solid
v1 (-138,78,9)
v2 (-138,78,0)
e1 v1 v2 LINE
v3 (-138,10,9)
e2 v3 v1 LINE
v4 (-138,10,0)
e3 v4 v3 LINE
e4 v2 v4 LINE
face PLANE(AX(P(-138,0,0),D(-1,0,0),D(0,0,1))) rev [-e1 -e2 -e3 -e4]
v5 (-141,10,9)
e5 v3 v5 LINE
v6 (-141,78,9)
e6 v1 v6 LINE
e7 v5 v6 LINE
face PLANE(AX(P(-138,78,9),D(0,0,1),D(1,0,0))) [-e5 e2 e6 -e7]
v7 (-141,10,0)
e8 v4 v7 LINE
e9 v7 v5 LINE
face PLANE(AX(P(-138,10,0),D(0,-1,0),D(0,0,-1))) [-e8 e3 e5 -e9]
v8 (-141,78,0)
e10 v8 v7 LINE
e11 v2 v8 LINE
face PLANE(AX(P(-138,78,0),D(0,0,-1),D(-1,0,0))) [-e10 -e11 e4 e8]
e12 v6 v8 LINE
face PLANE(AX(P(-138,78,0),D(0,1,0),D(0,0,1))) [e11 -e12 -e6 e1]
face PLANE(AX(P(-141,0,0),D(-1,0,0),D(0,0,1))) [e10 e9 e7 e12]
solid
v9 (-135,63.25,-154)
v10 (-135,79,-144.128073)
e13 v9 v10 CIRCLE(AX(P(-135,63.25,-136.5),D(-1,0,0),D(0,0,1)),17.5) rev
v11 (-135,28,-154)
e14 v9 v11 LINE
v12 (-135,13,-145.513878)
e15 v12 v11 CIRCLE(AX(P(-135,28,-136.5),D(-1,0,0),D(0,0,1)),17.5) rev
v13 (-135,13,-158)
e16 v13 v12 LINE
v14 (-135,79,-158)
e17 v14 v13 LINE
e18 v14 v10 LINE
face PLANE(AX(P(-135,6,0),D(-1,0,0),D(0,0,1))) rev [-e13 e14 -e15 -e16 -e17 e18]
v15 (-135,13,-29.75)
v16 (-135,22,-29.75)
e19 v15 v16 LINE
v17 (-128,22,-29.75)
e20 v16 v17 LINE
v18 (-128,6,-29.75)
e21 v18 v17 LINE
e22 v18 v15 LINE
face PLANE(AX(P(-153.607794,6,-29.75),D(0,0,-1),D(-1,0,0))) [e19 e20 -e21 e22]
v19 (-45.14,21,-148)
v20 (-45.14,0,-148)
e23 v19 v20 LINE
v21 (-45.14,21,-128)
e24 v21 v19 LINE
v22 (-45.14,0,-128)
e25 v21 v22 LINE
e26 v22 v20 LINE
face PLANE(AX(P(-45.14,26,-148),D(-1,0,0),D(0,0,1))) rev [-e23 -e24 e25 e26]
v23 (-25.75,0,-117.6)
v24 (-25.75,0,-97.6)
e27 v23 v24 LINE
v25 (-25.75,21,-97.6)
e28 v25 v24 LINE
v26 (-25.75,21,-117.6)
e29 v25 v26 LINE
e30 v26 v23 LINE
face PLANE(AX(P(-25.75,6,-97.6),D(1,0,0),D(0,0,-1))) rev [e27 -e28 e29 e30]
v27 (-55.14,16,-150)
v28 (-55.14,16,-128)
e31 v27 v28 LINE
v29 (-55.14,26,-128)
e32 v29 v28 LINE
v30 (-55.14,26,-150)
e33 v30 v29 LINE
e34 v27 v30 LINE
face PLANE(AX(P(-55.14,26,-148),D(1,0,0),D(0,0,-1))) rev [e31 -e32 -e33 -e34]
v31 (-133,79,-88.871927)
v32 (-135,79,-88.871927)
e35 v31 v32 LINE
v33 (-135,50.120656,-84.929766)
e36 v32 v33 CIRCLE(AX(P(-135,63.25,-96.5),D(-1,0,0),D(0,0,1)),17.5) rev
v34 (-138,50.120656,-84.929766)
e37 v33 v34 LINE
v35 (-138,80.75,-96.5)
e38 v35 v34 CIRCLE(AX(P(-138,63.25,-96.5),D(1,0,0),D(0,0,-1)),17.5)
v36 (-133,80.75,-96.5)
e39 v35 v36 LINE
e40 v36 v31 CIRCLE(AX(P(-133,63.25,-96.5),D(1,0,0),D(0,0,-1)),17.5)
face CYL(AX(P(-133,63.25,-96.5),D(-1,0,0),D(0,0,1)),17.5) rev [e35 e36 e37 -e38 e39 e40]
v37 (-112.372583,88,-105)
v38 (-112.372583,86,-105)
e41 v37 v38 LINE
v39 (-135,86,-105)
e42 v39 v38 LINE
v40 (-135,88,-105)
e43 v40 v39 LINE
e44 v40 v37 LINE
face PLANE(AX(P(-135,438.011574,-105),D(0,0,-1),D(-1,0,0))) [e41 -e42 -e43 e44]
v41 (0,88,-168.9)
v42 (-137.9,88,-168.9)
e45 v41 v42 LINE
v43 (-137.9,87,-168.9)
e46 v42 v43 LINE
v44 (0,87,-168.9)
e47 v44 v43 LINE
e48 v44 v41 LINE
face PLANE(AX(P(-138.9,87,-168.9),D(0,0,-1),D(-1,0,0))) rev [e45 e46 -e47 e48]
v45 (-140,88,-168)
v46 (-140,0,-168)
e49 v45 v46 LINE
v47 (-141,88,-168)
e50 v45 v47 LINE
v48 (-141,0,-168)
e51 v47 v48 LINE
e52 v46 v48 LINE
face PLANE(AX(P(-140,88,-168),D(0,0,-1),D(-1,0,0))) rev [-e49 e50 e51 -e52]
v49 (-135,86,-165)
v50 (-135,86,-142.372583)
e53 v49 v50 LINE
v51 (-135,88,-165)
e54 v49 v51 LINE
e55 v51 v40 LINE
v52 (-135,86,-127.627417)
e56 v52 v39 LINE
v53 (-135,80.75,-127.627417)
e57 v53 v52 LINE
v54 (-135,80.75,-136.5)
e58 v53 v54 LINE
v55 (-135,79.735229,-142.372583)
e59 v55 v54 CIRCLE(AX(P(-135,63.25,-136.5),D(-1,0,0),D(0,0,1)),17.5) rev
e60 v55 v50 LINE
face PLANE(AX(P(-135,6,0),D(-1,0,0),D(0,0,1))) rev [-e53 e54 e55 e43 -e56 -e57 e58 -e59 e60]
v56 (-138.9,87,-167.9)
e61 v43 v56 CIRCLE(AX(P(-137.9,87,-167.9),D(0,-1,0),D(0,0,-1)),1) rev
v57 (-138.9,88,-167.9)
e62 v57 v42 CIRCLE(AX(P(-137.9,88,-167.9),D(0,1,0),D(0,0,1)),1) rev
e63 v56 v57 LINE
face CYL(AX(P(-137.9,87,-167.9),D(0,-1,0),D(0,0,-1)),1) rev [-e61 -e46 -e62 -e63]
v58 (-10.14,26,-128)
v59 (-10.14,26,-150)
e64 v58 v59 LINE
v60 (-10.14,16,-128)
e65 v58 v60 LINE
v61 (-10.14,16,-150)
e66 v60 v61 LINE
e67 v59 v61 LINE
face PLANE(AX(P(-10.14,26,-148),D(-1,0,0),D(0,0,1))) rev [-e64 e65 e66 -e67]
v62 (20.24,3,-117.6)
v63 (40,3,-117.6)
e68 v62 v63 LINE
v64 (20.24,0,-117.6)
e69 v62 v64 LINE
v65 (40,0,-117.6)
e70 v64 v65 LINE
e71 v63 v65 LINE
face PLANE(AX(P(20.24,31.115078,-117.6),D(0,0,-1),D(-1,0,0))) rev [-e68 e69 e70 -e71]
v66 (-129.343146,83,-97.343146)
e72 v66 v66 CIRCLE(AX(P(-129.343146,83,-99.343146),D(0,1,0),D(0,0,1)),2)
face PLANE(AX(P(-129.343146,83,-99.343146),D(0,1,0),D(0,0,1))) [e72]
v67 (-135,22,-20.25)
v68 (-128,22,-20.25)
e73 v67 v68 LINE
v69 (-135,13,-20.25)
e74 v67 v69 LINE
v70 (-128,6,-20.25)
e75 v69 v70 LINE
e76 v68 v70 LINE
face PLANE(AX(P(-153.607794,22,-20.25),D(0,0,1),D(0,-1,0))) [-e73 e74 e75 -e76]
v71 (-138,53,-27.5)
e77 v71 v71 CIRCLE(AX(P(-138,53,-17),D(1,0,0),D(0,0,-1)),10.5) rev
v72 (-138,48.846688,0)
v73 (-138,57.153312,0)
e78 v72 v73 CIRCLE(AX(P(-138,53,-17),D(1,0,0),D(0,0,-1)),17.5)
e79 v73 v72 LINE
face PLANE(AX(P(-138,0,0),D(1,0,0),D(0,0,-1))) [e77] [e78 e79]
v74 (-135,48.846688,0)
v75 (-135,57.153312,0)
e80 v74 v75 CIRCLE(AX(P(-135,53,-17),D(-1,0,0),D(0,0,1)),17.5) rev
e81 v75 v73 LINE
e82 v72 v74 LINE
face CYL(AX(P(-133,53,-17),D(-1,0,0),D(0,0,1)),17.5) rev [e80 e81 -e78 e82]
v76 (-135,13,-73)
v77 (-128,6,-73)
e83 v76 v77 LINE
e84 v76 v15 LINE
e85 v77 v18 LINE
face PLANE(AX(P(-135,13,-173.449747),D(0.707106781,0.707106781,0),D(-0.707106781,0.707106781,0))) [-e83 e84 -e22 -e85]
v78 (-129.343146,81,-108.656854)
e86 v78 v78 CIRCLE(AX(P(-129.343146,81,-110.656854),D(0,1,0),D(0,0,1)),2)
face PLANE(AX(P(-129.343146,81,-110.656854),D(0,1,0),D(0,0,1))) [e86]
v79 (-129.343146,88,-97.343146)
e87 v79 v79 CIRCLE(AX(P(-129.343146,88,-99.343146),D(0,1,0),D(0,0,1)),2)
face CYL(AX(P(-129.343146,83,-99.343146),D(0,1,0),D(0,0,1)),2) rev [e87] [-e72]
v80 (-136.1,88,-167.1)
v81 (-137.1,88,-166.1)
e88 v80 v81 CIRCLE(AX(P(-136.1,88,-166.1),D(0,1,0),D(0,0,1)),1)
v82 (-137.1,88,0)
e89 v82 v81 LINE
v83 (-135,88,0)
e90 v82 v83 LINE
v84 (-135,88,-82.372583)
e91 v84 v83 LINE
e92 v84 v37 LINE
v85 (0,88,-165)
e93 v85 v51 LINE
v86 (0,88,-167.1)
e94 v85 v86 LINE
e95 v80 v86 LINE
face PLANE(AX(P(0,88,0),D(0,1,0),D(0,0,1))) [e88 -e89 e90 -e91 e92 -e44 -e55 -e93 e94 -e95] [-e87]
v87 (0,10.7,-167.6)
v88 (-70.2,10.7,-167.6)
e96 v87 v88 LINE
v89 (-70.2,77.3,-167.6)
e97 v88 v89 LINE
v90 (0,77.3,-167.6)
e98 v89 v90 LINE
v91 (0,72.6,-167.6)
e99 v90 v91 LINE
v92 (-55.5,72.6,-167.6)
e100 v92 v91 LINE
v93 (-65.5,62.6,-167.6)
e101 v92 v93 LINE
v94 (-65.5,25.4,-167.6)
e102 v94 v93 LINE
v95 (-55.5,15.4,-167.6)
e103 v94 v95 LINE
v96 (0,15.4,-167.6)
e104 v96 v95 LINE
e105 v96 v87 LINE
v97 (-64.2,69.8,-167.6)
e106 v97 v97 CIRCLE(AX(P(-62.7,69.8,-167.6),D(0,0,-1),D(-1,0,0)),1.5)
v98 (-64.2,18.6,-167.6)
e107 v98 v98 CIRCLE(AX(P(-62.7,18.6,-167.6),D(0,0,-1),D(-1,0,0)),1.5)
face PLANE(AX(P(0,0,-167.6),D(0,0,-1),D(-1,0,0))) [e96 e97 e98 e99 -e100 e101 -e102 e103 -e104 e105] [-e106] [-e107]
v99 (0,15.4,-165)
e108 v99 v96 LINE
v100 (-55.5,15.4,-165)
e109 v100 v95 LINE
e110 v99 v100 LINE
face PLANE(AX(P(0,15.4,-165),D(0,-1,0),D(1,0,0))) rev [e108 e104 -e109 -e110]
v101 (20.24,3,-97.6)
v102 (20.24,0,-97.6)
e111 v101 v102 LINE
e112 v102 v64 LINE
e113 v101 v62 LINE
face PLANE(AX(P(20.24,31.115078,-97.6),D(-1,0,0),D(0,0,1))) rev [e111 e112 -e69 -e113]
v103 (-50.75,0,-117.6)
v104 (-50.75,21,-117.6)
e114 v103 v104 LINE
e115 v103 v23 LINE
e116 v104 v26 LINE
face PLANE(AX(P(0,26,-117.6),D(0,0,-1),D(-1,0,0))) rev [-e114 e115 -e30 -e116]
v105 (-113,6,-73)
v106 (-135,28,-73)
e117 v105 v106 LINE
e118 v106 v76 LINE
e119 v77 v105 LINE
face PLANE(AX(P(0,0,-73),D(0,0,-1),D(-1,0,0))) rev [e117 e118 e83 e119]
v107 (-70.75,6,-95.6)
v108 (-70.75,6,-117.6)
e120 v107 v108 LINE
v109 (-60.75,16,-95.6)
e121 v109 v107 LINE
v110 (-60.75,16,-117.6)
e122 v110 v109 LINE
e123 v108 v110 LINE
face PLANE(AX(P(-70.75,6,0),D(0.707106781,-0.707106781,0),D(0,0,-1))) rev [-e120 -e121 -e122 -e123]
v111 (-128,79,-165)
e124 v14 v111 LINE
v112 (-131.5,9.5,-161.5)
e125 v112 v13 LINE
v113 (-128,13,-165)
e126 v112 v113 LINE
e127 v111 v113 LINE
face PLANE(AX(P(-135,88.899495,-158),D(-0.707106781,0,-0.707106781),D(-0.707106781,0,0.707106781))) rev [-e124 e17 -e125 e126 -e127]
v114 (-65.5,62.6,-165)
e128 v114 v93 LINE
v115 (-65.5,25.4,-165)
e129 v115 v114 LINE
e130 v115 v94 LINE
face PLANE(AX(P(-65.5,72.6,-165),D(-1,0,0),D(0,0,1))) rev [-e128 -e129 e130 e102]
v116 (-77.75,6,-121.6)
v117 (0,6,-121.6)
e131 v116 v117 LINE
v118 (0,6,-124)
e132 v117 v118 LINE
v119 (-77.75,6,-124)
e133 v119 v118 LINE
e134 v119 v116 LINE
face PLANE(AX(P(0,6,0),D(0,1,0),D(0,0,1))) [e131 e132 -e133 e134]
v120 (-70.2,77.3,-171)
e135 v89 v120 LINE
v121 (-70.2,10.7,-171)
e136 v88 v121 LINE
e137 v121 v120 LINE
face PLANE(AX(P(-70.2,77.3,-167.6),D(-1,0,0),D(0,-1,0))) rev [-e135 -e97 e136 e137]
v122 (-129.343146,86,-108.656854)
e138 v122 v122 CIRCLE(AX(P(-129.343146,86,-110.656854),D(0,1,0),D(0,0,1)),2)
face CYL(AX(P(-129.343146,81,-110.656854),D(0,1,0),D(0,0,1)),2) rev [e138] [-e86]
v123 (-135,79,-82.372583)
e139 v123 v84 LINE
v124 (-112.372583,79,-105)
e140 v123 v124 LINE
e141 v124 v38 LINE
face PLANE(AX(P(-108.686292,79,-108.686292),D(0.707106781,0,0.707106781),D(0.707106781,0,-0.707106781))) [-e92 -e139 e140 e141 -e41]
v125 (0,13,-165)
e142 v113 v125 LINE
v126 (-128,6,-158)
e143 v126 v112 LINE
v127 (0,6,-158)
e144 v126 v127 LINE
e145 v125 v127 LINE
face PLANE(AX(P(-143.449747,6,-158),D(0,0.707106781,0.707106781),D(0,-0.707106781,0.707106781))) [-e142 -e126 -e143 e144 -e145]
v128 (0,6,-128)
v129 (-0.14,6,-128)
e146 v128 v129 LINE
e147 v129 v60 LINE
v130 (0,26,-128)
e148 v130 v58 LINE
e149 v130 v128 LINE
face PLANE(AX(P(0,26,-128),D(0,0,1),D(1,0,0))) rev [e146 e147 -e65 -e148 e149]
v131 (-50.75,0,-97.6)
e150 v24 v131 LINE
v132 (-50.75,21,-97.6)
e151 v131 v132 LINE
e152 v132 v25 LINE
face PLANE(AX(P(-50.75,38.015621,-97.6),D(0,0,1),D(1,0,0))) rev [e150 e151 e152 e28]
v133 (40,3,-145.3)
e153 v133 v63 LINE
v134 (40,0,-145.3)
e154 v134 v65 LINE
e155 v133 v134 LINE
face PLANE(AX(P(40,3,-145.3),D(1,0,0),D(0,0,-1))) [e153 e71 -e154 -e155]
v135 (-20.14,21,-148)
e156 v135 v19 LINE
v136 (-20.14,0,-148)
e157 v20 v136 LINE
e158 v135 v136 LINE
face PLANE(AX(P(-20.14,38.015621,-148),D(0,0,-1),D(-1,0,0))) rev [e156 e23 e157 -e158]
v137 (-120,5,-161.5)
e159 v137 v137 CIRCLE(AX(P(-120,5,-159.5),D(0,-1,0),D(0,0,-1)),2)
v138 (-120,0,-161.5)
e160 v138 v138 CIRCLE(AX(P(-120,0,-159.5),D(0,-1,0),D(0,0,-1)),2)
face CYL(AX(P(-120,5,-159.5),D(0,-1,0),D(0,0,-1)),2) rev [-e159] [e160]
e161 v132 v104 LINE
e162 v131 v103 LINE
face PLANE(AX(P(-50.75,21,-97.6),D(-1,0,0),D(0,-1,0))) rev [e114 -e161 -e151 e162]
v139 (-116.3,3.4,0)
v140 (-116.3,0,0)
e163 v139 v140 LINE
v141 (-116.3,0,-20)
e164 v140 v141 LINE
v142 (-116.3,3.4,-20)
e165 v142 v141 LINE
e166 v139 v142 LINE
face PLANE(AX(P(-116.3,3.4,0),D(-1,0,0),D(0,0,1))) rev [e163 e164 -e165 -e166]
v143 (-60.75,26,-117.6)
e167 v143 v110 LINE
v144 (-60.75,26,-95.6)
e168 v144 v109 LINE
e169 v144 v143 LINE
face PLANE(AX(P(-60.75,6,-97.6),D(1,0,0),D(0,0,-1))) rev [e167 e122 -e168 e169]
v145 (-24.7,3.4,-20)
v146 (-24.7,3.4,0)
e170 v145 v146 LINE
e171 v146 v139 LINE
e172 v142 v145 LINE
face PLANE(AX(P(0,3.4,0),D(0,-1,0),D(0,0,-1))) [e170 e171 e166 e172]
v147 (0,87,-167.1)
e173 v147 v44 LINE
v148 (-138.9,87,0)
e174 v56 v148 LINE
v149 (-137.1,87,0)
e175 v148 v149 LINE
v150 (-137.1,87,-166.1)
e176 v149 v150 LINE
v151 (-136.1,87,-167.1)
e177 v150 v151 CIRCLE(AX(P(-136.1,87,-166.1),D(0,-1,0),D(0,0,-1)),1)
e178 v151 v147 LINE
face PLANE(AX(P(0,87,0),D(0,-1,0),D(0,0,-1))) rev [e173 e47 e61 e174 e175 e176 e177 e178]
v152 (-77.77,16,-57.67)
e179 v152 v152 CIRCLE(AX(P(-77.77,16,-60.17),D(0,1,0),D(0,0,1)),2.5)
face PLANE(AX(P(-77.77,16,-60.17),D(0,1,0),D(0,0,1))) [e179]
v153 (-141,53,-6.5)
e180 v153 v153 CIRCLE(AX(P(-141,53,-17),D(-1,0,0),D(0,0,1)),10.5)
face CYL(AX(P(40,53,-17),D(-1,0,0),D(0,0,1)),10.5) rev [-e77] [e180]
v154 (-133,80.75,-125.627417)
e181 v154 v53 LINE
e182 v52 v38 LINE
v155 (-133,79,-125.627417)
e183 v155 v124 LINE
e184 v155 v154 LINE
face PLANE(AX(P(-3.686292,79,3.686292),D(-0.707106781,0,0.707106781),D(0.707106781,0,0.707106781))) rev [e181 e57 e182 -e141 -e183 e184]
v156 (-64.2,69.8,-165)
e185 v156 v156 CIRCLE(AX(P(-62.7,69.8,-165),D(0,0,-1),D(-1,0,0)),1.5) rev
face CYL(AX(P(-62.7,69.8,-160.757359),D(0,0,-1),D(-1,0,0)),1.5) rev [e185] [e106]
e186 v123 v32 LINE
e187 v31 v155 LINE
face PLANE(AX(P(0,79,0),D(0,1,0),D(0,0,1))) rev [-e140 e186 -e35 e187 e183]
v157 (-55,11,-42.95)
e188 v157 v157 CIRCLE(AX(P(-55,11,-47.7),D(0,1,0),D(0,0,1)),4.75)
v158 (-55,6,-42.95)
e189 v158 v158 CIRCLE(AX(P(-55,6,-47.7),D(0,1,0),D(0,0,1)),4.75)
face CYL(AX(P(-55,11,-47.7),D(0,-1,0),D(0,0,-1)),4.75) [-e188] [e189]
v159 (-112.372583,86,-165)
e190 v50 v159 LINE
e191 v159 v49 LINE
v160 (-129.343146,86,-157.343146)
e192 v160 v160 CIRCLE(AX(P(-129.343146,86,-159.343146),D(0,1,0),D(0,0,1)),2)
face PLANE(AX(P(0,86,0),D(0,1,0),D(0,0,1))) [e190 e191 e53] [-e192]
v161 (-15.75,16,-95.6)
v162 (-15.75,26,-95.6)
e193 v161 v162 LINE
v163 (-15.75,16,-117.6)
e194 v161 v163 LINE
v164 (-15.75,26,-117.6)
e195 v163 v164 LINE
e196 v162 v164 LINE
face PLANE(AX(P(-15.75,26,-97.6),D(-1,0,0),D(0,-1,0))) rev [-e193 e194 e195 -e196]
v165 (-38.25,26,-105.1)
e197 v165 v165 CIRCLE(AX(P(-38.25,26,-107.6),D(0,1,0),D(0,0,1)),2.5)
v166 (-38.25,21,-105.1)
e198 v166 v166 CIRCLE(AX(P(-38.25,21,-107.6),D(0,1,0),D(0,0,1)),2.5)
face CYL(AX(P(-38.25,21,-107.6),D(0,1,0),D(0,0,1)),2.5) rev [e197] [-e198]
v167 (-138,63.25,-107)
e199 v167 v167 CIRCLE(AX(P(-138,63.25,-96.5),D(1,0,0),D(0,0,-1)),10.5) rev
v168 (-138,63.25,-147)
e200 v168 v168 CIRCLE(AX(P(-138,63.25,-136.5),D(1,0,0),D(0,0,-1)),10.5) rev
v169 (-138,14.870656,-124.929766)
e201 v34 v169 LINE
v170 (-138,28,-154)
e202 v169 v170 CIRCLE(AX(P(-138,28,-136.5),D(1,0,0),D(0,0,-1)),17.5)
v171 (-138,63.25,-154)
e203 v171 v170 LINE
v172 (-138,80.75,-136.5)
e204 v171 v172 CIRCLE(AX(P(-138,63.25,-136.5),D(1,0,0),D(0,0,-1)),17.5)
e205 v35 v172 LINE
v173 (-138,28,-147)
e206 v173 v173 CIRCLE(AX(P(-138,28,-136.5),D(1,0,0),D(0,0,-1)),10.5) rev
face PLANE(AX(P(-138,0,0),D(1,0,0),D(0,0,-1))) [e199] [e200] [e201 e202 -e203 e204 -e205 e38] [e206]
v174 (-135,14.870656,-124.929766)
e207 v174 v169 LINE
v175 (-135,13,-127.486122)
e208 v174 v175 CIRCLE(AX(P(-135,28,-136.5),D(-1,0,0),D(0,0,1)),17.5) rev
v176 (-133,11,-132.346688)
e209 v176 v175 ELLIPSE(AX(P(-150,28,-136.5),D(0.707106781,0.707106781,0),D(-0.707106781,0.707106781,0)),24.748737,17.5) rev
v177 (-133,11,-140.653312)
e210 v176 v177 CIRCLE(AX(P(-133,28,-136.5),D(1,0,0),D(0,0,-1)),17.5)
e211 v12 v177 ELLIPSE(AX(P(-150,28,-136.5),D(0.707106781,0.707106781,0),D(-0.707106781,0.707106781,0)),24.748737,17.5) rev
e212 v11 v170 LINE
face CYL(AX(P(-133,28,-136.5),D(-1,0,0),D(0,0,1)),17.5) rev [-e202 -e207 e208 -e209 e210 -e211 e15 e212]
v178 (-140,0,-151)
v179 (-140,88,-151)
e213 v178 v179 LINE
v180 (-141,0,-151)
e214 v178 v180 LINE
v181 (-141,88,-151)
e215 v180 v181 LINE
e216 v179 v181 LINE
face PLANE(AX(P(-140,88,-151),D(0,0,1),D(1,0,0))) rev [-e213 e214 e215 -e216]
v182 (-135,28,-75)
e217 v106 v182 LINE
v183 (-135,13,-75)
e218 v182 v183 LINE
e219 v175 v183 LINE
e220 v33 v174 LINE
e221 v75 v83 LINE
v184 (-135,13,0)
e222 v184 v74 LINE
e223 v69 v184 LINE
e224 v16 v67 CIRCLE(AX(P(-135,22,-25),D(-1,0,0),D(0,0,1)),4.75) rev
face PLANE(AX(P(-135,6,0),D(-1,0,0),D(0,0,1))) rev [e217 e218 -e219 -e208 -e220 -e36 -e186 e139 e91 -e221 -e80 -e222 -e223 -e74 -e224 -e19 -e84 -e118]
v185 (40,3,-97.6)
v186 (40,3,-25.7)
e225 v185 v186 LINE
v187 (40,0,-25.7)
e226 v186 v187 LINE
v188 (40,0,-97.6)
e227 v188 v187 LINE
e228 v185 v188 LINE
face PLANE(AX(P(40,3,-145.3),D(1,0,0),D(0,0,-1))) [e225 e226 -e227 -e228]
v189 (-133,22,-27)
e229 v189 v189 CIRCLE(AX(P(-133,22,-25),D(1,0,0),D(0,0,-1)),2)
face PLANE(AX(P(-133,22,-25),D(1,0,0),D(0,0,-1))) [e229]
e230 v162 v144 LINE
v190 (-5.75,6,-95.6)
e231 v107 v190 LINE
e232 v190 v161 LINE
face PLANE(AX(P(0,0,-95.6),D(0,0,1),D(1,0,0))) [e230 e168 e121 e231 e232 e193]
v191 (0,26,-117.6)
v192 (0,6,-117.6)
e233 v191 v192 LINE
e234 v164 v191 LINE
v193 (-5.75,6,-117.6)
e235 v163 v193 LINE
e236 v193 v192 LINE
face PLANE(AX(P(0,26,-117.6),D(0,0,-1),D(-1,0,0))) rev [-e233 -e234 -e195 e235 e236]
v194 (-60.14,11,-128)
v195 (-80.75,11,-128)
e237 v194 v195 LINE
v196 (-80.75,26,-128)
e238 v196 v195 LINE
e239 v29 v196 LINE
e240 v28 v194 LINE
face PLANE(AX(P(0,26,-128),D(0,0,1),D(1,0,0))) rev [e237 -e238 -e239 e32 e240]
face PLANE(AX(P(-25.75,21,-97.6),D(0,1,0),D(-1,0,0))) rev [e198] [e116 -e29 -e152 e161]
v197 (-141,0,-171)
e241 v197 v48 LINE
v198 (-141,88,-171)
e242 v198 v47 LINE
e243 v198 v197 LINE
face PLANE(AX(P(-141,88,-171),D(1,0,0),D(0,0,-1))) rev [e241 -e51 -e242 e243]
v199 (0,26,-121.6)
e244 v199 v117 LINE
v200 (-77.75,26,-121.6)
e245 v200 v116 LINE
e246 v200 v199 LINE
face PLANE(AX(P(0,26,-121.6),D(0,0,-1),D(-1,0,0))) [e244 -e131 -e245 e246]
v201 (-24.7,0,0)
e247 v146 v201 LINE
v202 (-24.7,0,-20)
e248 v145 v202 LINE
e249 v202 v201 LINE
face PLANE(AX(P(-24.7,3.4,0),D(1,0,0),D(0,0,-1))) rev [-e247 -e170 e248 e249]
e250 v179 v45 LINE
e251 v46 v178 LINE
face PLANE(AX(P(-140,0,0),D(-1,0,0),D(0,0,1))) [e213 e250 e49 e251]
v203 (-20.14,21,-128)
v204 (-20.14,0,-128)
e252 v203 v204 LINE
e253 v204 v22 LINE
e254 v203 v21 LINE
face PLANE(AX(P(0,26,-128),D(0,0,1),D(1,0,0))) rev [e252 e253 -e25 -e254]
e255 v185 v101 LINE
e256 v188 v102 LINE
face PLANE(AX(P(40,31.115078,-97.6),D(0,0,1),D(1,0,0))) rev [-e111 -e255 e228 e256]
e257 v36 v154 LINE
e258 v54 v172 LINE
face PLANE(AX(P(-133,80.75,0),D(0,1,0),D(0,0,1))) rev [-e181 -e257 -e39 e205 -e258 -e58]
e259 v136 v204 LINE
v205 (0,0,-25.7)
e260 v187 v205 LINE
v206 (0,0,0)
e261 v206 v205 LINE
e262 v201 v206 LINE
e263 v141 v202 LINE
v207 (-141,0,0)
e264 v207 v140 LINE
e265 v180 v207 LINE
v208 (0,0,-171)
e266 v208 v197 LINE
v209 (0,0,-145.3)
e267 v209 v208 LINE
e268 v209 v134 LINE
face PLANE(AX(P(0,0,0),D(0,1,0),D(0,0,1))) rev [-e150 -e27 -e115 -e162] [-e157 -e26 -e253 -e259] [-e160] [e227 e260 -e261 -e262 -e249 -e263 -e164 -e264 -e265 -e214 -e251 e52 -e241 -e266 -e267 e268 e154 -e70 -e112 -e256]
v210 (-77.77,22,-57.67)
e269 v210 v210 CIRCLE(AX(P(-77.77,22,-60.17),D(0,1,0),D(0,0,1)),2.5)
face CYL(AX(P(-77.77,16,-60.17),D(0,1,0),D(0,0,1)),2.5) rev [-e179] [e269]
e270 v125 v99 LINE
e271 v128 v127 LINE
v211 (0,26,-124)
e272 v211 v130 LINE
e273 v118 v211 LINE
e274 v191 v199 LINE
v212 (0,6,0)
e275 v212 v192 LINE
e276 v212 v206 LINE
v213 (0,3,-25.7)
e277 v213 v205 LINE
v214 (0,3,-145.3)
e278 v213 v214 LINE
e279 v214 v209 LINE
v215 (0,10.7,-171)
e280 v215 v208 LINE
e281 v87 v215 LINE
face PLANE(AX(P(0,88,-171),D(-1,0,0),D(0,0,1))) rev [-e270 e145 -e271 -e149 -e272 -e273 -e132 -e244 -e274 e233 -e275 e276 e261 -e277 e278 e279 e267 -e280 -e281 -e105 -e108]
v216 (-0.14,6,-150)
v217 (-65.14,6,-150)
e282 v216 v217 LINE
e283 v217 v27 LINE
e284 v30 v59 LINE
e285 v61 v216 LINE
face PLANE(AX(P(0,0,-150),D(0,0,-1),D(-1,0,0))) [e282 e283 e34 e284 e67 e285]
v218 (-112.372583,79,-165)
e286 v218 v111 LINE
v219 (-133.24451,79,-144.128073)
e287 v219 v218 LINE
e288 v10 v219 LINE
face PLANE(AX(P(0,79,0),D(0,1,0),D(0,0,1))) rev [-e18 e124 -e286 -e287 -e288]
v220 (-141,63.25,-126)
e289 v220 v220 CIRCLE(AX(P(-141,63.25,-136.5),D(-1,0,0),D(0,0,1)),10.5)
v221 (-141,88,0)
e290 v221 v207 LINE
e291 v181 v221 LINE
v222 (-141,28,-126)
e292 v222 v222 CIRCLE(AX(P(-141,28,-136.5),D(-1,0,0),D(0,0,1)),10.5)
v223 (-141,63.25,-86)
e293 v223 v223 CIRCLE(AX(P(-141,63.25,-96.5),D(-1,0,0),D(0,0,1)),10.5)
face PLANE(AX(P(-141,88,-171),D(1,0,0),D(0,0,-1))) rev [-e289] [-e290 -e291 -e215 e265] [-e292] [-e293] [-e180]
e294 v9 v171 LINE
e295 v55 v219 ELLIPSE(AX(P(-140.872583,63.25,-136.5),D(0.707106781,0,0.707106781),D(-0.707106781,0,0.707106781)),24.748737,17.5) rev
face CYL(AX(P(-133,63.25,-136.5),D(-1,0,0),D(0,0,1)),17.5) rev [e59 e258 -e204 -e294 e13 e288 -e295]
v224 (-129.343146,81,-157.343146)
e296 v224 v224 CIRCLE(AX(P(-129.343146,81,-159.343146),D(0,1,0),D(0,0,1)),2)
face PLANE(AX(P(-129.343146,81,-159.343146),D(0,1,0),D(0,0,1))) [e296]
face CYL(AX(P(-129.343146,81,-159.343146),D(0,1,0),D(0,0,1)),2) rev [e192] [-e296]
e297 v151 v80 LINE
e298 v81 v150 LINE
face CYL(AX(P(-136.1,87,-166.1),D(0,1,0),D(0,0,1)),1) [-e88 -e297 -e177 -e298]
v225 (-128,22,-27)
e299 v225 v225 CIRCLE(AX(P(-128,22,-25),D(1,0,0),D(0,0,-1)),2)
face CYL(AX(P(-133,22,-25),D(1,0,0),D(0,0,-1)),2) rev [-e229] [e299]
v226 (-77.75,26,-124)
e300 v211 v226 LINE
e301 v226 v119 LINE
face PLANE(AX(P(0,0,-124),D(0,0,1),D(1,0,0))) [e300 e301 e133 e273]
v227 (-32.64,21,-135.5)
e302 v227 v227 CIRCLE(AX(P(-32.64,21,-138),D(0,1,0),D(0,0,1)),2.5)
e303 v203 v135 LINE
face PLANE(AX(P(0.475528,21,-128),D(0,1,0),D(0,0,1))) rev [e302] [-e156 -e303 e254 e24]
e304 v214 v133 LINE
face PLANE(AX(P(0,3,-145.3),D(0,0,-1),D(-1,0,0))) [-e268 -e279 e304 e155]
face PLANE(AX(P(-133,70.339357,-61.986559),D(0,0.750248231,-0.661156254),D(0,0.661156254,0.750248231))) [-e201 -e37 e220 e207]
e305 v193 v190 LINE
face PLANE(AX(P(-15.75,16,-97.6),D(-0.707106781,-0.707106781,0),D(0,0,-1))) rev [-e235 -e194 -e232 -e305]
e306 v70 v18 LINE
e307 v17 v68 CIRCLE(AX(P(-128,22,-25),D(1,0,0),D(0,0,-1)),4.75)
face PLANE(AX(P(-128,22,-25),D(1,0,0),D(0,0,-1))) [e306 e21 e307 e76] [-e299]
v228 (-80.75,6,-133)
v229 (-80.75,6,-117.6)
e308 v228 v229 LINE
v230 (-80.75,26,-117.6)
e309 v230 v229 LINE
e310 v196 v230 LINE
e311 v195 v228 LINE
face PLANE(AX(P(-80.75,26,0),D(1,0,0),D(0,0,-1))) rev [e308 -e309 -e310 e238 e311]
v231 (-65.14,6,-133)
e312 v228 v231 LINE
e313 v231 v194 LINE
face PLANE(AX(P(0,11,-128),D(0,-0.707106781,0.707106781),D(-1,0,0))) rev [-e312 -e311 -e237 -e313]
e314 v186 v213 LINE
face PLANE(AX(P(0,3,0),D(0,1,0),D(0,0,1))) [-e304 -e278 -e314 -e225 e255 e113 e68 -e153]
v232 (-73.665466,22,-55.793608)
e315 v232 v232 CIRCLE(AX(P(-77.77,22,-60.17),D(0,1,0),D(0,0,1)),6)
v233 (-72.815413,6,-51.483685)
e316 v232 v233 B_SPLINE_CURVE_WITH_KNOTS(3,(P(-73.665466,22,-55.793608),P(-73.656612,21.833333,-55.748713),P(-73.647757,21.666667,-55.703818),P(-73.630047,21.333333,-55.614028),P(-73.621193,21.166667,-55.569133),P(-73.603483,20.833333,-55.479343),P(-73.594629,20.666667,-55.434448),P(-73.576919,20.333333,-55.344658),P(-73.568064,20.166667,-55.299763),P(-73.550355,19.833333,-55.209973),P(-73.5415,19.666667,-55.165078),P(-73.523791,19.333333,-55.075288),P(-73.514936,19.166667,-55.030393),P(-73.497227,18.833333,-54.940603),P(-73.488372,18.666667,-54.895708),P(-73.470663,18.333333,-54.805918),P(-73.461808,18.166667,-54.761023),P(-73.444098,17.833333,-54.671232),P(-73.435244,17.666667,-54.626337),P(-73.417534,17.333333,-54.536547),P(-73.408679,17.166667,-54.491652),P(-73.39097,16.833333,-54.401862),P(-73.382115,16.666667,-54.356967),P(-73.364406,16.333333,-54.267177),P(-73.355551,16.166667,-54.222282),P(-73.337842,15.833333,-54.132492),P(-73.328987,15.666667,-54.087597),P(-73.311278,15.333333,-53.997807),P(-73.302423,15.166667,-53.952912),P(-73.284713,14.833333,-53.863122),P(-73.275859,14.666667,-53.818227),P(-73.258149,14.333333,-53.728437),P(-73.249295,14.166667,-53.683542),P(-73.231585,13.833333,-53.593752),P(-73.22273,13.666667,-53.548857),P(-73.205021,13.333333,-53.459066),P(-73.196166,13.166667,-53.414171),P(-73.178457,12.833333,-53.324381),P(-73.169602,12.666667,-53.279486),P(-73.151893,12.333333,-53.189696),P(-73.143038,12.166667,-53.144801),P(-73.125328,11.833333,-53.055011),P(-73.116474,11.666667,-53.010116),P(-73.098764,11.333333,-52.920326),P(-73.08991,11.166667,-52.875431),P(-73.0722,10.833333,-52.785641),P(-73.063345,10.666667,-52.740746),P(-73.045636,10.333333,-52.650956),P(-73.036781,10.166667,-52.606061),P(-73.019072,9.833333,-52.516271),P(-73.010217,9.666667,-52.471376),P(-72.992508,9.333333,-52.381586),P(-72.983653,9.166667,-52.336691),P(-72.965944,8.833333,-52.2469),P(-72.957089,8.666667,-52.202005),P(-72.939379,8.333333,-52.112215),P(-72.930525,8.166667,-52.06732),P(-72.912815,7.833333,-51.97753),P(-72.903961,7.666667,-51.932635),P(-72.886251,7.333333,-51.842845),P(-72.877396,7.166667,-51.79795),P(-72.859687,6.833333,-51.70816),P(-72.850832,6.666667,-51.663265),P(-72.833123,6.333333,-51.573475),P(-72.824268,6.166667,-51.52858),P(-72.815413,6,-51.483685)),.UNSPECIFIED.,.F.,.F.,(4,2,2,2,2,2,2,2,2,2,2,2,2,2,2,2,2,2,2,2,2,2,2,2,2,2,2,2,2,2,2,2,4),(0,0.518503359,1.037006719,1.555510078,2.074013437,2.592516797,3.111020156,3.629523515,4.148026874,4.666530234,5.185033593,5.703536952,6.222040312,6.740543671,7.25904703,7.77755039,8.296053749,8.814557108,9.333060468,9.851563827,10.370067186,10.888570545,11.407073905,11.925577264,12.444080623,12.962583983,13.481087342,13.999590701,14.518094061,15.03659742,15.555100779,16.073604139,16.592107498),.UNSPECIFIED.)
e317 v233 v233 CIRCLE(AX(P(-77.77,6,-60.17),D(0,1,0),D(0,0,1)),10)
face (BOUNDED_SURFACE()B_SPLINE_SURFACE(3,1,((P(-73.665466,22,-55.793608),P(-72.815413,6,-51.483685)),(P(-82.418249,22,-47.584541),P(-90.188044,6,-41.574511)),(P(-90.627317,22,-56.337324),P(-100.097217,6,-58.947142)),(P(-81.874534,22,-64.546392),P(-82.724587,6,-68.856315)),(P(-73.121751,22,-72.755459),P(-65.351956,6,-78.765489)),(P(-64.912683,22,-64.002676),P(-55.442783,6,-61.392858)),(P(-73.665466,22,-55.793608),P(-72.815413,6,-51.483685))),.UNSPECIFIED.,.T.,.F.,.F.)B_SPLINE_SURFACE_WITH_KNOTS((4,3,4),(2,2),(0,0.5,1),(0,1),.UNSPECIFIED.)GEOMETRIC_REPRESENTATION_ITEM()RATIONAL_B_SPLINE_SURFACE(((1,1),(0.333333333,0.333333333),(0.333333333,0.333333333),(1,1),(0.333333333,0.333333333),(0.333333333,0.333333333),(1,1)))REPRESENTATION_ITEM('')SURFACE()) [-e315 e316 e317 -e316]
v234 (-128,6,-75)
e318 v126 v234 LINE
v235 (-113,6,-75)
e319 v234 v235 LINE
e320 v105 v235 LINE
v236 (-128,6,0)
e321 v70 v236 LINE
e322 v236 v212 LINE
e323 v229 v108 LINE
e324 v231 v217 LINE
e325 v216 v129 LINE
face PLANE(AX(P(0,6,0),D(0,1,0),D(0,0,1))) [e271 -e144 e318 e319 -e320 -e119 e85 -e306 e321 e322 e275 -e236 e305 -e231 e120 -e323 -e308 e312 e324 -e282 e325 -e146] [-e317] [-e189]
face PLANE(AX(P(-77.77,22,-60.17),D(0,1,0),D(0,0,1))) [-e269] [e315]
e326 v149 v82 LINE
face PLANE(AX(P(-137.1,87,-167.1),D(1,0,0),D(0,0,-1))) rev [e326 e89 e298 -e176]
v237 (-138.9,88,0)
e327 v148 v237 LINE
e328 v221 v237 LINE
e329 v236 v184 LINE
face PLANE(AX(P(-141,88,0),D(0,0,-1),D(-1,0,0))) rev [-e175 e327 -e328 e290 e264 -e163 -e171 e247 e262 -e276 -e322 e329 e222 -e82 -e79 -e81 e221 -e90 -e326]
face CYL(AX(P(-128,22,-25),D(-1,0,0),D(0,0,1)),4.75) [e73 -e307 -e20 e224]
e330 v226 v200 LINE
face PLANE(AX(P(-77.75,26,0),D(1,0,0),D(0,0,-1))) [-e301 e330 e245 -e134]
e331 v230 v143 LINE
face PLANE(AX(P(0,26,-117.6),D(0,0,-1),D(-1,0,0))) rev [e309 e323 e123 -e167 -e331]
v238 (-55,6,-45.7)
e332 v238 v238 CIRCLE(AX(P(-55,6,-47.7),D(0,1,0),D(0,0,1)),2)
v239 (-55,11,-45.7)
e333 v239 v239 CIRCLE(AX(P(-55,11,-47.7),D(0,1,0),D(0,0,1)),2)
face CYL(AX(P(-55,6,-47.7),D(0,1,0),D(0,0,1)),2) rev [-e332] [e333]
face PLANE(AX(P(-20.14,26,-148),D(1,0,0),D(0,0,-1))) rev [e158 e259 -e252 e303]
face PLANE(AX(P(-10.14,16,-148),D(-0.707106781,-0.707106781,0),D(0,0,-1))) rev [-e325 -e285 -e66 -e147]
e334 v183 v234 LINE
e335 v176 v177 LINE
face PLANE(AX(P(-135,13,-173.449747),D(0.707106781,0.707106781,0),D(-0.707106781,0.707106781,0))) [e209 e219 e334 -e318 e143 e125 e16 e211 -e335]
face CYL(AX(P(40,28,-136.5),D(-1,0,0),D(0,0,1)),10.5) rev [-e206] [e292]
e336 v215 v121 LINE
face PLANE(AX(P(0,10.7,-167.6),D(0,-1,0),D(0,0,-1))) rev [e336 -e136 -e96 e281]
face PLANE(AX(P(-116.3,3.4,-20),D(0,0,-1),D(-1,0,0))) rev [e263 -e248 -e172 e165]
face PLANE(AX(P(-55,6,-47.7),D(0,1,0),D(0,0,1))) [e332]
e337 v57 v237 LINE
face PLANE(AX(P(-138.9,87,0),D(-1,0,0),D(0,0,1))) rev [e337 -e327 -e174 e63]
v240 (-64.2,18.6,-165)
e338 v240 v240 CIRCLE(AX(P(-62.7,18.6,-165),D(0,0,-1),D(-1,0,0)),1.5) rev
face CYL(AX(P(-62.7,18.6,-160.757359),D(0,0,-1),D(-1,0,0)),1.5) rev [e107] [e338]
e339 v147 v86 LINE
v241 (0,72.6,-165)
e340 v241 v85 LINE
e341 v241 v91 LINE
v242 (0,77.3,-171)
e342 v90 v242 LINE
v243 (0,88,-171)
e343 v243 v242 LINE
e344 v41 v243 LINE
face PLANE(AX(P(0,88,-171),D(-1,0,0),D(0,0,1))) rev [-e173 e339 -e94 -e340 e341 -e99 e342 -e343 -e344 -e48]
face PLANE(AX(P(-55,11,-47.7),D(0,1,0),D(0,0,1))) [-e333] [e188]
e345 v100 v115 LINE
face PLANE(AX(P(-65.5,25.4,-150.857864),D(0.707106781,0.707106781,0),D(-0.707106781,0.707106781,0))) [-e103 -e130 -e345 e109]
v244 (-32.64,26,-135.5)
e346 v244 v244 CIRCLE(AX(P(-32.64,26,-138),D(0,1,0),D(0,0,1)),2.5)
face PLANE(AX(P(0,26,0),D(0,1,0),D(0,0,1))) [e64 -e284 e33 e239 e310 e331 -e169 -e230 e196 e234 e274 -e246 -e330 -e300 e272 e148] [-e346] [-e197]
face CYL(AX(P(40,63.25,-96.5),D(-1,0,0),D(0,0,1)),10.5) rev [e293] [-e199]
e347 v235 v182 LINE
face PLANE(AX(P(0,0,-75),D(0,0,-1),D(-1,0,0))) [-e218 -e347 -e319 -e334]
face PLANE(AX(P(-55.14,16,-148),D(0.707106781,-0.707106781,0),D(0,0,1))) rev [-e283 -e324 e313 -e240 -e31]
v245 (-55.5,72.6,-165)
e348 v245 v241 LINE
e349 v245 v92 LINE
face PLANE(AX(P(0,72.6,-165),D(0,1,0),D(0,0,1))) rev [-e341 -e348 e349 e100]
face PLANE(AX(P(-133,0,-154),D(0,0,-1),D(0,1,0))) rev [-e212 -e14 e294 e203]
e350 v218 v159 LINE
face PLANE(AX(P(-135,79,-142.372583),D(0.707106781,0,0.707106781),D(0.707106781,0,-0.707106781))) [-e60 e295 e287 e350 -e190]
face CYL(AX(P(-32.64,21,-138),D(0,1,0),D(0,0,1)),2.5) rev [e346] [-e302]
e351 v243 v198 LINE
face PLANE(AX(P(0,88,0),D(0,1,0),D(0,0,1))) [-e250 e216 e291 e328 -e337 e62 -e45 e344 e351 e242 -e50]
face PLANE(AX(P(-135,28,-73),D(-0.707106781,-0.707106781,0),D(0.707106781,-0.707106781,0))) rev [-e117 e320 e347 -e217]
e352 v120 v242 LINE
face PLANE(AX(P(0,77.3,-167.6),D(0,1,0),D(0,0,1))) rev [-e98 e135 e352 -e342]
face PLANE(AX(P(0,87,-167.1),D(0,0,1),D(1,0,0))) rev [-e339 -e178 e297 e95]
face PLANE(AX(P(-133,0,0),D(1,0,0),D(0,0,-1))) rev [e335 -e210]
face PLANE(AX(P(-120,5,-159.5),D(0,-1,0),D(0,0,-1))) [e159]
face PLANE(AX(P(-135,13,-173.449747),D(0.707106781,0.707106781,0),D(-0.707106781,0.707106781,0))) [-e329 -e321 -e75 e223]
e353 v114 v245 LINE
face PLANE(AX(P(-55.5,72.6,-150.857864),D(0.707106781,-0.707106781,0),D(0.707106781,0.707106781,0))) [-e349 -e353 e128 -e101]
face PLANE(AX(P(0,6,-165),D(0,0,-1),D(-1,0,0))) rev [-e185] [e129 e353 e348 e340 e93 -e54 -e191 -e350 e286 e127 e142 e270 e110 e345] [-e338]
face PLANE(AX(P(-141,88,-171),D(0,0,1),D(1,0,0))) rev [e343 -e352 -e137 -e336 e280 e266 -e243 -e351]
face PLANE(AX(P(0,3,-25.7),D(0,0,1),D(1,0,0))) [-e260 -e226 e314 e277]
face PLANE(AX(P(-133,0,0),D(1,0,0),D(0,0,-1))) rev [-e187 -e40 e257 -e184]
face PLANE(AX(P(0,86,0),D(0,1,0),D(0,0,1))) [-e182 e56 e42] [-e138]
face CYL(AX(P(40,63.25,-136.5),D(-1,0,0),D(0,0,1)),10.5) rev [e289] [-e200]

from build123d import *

# Parameters (mm, degrees)
SKETCH1_W                = 141
SKETCH1_H                = 171
BOSS_EXTRUDE1_DEPTH      = 88
SKETCH2_W                = 135
SKETCH2_H                = 165
CUT_EXTRUDE1_DEPTH       = 82
SKETCH3_W                = 40
SKETCH3_H                = 119.6
BOSS_EXTRUDE2_DEPTH      = 3
SKETCH4_W                = 91.6
SKETCH4_H                = 20
CUT_EXTRUDE2_DEPTH       = 3.4
SKETCH5_W                = 9
SKETCH5_H                = 68
BOSS_EXTRUDE3_DEPTH      = 3
SKETCH7_W                = 70.2
SKETCH7_H                = 66.6
CUT_EXTRUDE4_DEPTH       = 3.4
SKETCH9_W                = 65.5
SKETCH9_H                = 57.2
CUT_EXTRUDE5_DEPTH       = 2.6
SKETCH10_R               = 10.5
CUT_EXTRUDE6_DEPTH       = 265.094679992
BOSS_EXTRUDE5_DEPTH      = 7
BOSS_EXTRUDE6_DEPTH      = 9
CUT_EXTRUDE7_DEPTH       = 239.465930481
CUT_EXTRUDE7_DEPTH_BACK  = 2
BOSS_EXTRUDE7_DEPTH      = 73
SKETCH16_R               = 2
CUT_EXTRUDE8_DEPTH       = 5
SKETCH17_R               = 2
CUT_EXTRUDE9_DEPTH       = 5
SKETCH18_R               = 4.75
BOSS_EXTRUDE8_DEPTH      = 5
SKETCH20_R               = 2
CUT_EXTRUDE11_DEPTH      = 5
BOSS_EXTRUDE25_REACH     = 240.466
BOSS_EXTRUDE26_REACH     = 240.466
SKETCH43_R               = 2.5
CUT_EXTRUDE14_DEPTH      = 6
SKETCH45_R               = 4.75
BOSS_EXTRUDE27_DEPTH     = 7
SKETCH46_R               = 2
CUT_EXTRUDE15_DEPTH      = 5
CUT_EXTRUDE16_DEPTH      = 2
CUT_EXTRUDE16_DEPTH_BACK = 3
SKETCH47_R               = 17.5
SKETCH55_W               = 10
SKETCH55_H               = 20
BOSS_EXTRUDE34_DEPTH     = 20
SKETCH56_W               = 20
SKETCH56_H               = 5
BOSS_EXTRUDE35_DEPTH     = 25
CHAMFER2_SIZE            = 10
CHAMFER3_SIZE            = 10
SKETCH57_R               = 2.5
CUT_EXTRUDE17_DEPTH      = 5
BOSS_EXTRUDE36_DEPTH     = 20
CHAMFER6_SIZE            = 5
BOSS_EXTRUDE37_DEPTH     = 20
CHAMFER7_SIZE            = 10
CHAMFER8_SIZE            = 10
SKETCH60_R               = 2.5
CUT_EXTRUDE18_DEPTH      = 5
CUT_EXTRUDE19_DEPTH      = 1
SKETCH63_W               = 17
SKETCH63_H               = 88
CUT_EXTRUDE20_DEPTH      = 1
BOSS_EXTRUDE39_START     = -7
BOSS_EXTRUDE39_DEPTH     = 7
BOSS_EXTRUDE40_DEPTH     = 2
SKETCH67_W               = 77.75
SKETCH67_H               = 20
BOSS_EXTRUDE41_DEPTH     = 1
BOSS_EXTRUDE42_DEPTH     = 2.6
SKETCH69_R               = 1.5
CUT_EXTRUDE21_DEPTH      = 2.6
FILLET1_R                = 1
FILLET2_R                = 1
SKETCH70_W               = 25
SKETCH70_H               = 20
CUT_EXTRUDE22_DEPTH      = 6
BOSS_EXTRUDE43_DEPTH     = 2
BOSS_EXTRUDE44_DEPTH     = 2
SKETCH73_W               = 19.76
SKETCH73_H               = 20
CUT_EXTRUDE23_DEPTH      = 3
SKETCH74_R               = 2
CUT_EXTRUDE24_DEPTH      = 5


with BuildPart() as part:
    # Sketch1 → Boss-Extrude1 (new body)
    with BuildSketch(Plane(origin=(0, 0, 0), x_dir=(1, 0, 0), z_dir=(0, 1, 0))):
        with Locations((-70.5, 85.5)):
            Rectangle(SKETCH1_W, SKETCH1_H)
    extrude(amount=BOSS_EXTRUDE1_DEPTH)

    # Sketch2 → Cut-Extrude1 (cut)
    with BuildSketch(Plane(origin=(0, 88, 0), x_dir=(1, 0, 0), z_dir=(0, 1, 0))):
        with Locations((-67.5, 82.5)):
            Rectangle(SKETCH2_W, SKETCH2_H)
    extrude(amount=-CUT_EXTRUDE1_DEPTH, mode=Mode.SUBTRACT)

    # Sketch3 → Boss-Extrude2 (add)
    with BuildSketch(Plane.XZ):
        with Locations((20, -85.5)):
            Rectangle(SKETCH3_W, SKETCH3_H)
    extrude(amount=-BOSS_EXTRUDE2_DEPTH)

    # Sketch4 → Cut-Extrude2 (cut)
    with BuildSketch(Plane.XZ):
        with Locations((-70.5, -10)):
            Rectangle(SKETCH4_W, SKETCH4_H)
    extrude(amount=-CUT_EXTRUDE2_DEPTH, mode=Mode.SUBTRACT)

    # Sketch7 → Cut-Extrude4 (cut)
    with BuildSketch(Plane(origin=(0, 0, -171), x_dir=(-1, 0, 0), z_dir=(0, 0, -1))):
        with Locations((35.1, 44)):
            Rectangle(SKETCH7_W, SKETCH7_H)
    extrude(amount=-CUT_EXTRUDE4_DEPTH, mode=Mode.SUBTRACT)

    # Sketch9 → Cut-Extrude5 (cut)
    with BuildSketch(Plane(origin=(0, 0, -167.6), x_dir=(-1, 0, 0), z_dir=(0, 0, -1))):
        with Locations((32.75, 44)):
            Rectangle(SKETCH9_W, SKETCH9_H)
    extrude(amount=-CUT_EXTRUDE5_DEPTH, mode=Mode.SUBTRACT)

    # Sketch10 → Cut-Extrude6 (cut, through all)
    with BuildSketch(Plane.ZY.offset(141)):
        with Locations((-136.5, 28)):
            Circle(SKETCH10_R)
        with Locations((-96.5, 63.25)):
            Circle(SKETCH10_R)
        with Locations((-136.5, 63.25)):
            Circle(SKETCH10_R)
        with Locations((-17, 53)):
            Circle(SKETCH10_R)
    extrude(amount=-CUT_EXTRUDE6_DEPTH, mode=Mode.SUBTRACT)

    # Sketch12 → Boss-Extrude5 (add)
    with BuildSketch(Plane(origin=(0, 86, 0), x_dir=(1, 0, 0), z_dir=(0, 1, 0))):
        Polygon((-112.372583002, 165), (-135, 165), (-135, 142.372583002), align=None)
    extrude(amount=-BOSS_EXTRUDE5_DEPTH)

    # Sketch13 → Boss-Extrude6 (add)
    with BuildSketch(Plane(origin=(0, 88, 0), x_dir=(1, 0, 0), z_dir=(0, 1, 0))):
        Polygon((-135, 82.372583002), (-112.372583002, 105), (-135, 127.627416998), align=None)
    extrude(amount=-BOSS_EXTRUDE6_DEPTH)

    # Sketch14 → Cut-Extrude7 (cut, two sides: drawn at the far end of the back side and taken through both)
    with BuildSketch(Plane(origin=(0, 88, 0), x_dir=(1, 0, 0), z_dir=(0, 1, 0)).offset(-CUT_EXTRUDE7_DEPTH_BACK)):
        Polygon((-112.372583002, 105), (-135, 127.627416998), (-135, 105), align=None)
    extrude(amount=CUT_EXTRUDE7_DEPTH + CUT_EXTRUDE7_DEPTH_BACK, mode=Mode.SUBTRACT)

    # Sketch15 → Boss-Extrude7 (add)
    with BuildSketch(Plane(origin=(0, 6, 0), x_dir=(1, 0, 0), z_dir=(0, 1, 0))):
        Polygon((-135, 165), (-135, 158), (-128, 165), align=None)
    extrude(amount=BOSS_EXTRUDE7_DEPTH)

    # Sketch16 → Cut-Extrude8 (cut)
    with BuildSketch(Plane(origin=(0, 86, 0), x_dir=(1, 0, 0), z_dir=(0, 1, 0))):
        with Locations(Location((-129.343145751, 159.343145751, 0), (0, 0, 270))):
            Circle(SKETCH16_R)
        with Locations(Location((-129.343145751, 110.656854249, 0), (0, 0, 270))):
            Circle(SKETCH16_R)
    extrude(amount=-CUT_EXTRUDE8_DEPTH, mode=Mode.SUBTRACT)

    # Sketch17 → Cut-Extrude9 (cut)
    with BuildSketch(Plane(origin=(0, 88, 0), x_dir=(1, 0, 0), z_dir=(0, 1, 0))):
        with Locations(Location((-129.343145751, 99.343145751, 0), (0, 0, 270))):
            Circle(SKETCH17_R)
    extrude(amount=-CUT_EXTRUDE9_DEPTH, mode=Mode.SUBTRACT)

    # Sketch18 → Boss-Extrude8 (add)
    with BuildSketch(Plane(origin=(0, 6, 0), x_dir=(1, 0, 0), z_dir=(0, 1, 0))):
        with Locations(Location((-55, 47.7, 0), (0, 0, 270))):
            Circle(SKETCH18_R)
    extrude(amount=BOSS_EXTRUDE8_DEPTH)

    # Sketch20 → Cut-Extrude11 (cut)
    with BuildSketch(Plane(origin=(0, 11, 0), x_dir=(1, 0, 0), z_dir=(0, 1, 0))):
        with Locations(Location((-55, 47.7, 0), (0, 0, 270))):
            Circle(SKETCH20_R)
    extrude(amount=-CUT_EXTRUDE11_DEPTH, mode=Mode.SUBTRACT)

    # Boss-Extrude25: up to this plane
    boss_extrude25_end = Plane(origin=(-135, 88.899494937, -158), z_dir=(-0.7071067811865476, 0, -0.7071067811865476))
    # Sketch39 → Boss-Extrude25 (add, up to the surface)
    with BuildSketch(Plane.XY, mode=Mode.PRIVATE) as boss_extrude25_sk1:
        Polygon((-135, 6), (-135, 13), (-128, 6), align=None)
    boss_extrude25_tool1 = split(extrude(boss_extrude25_sk1.sketch, amount=-BOSS_EXTRUDE25_REACH, mode=Mode.PRIVATE), bisect_by=boss_extrude25_end, keep=Keep.BOTH, mode=Mode.PRIVATE)
    add(boss_extrude25_tool1.solids().sort_by_distance((-132.666667, 8.333333, 0))[0])

    # Boss-Extrude26: up to this plane
    boss_extrude26_end = Plane(origin=(-135, 13, -173.449747468), z_dir=(0.7071067811865476, 0.7071067811865476, 0))
    # Sketch40 → Boss-Extrude26 (add, up to the surface)
    with BuildSketch(Plane(origin=(0, 0, 0), x_dir=(0, 0, -1), z_dir=(1, 0, 0)), mode=Mode.PRIVATE) as boss_extrude26_sk1:
        Polygon((165, 6), (158, 6), (165, 13), align=None)
    boss_extrude26_tool1 = split(extrude(boss_extrude26_sk1.sketch, amount=-BOSS_EXTRUDE26_REACH, mode=Mode.PRIVATE), bisect_by=boss_extrude26_end, keep=Keep.BOTH, mode=Mode.PRIVATE)
    add(boss_extrude26_tool1.solids().sort_by_distance((0, 8.333333, -162.666667))[0])

    # Loft1: read off the stored shape, not the designer's step
    # Loft1: loft between two sections, ruled curve by curve
    loft1_from = [
        Edge.make_bspline([(-73.665466322, 22, -55.793608417), (-82.418249488, 22, -47.584541061), (-90.627316844, 22, -56.337324227), (-81.874533678, 22, -64.546391583), (-73.121750512, 22, -72.755458939), (-64.912683156, 22, -64.002675773), (-73.665466322, 22, -55.793608417)], [0, 0, 0, 0, 0.5, 0.5, 0.5, 1, 1, 1, 1], 3, [1, 0.333333333, 0.333333333, 1, 0.333333333, 0.333333333, 1]),
    ]
    loft1_to = [
        Edge.make_bspline([(-72.815413316, 6, -51.483684856), (-90.188043604, 6, -41.574511487), (-100.097216973, 6, -58.947141776), (-82.724586684, 6, -68.856315144), (-65.351956396, 6, -78.765488513), (-55.442783027, 6, -61.392858224), (-72.815413316, 6, -51.483684856)], [0, 0, 0, 0, 0.5, 0.5, 0.5, 1, 1, 1, 1], 3, [1, 0.333333333, 0.333333333, 1, 0.333333333, 0.333333333, 1]),
    ]
    loft1 = Solid(Shell([*[Face.make_surface_from_curves(loft1_from[k], loft1_to[k]) for k in range(1)], Face(Wire(loft1_from)), Face(Wire(loft1_to))]))
    add(loft1)

    # Sketch43 → Cut-Extrude14 (cut)
    with BuildSketch(Plane(origin=(0, 22, 0), x_dir=(1, 0, 0), z_dir=(0, 1, 0))):
        with Locations(Location((-77.77, 60.17, 0), (0, 0, 270))):
            Circle(SKETCH43_R)
    extrude(amount=-CUT_EXTRUDE14_DEPTH, mode=Mode.SUBTRACT)

    # Sketch45 → Boss-Extrude27 (add)
    with BuildSketch(Plane(origin=(-135, 0, 0), x_dir=(0, 0, -1), z_dir=(1, 0, 0))):
        with Locations(Location((25, 22, 0), (0, 0, 180))):
            Circle(SKETCH45_R)
    extrude(amount=BOSS_EXTRUDE27_DEPTH)

    # Sketch46 → Cut-Extrude15 (cut)
    with BuildSketch(Plane(origin=(-128, 0, 0), x_dir=(0, 0, -1), z_dir=(1, 0, 0))):
        with Locations((25, 22)):
            Circle(SKETCH46_R)
    extrude(amount=-CUT_EXTRUDE15_DEPTH, mode=Mode.SUBTRACT)

    # Sketch47 → Cut-Extrude16 (cut, two sides: drawn at the far end of the back side and taken through both)
    with BuildSketch(Plane(origin=(-135, 0, 0), x_dir=(0, 0, -1), z_dir=(1, 0, 0)).offset(-CUT_EXTRUDE16_DEPTH_BACK)):
        with Locations((17, 53)):
            Circle(SKETCH47_R)
        with BuildLine():
            Line((96.5, 80.75), (136.5, 80.75))
            ThreePointArc((136.5, 80.75), (148.874368671, 75.624368671), (154, 63.25))
            Line((154, 63.25), (154, 28))
            ThreePointArc((154, 28), (143.703155465, 12.051189658), (124.929765561, 14.870655956))
            Line((124.929765561, 14.870655956), (84.929765561, 50.120655956))
            ThreePointArc((84.929765561, 50.120655956), (80.129087979, 69.434111869), (96.5, 80.75))
        make_face()
    extrude(amount=CUT_EXTRUDE16_DEPTH + CUT_EXTRUDE16_DEPTH_BACK, mode=Mode.SUBTRACT)

    # Sketch55 → Boss-Extrude34 (add)
    with BuildSketch(Plane(origin=(0, 6, 0), x_dir=(1, 0, 0), z_dir=(0, 1, 0))):
        with Locations((-50.14, 138)):
            Rectangle(SKETCH55_W, SKETCH55_H)
        with Locations((-15.14, 138)):
            Rectangle(SKETCH55_W, SKETCH55_H)
    extrude(amount=BOSS_EXTRUDE34_DEPTH)

    # Sketch56 → Boss-Extrude35 (add)
    with BuildSketch(Plane(origin=(-45.14, 0, 0), x_dir=(0, 0, -1), z_dir=(1, 0, 0))):
        with Locations((138, 23.5)):
            Rectangle(SKETCH56_W, SKETCH56_H)
    extrude(amount=BOSS_EXTRUDE35_DEPTH)

    # Chamfer2
    chamfer2_edges = [part.edges().sort_by_distance(p)[0] for p in [
        (-10.14, 6, -138),
    ]]
    chamfer(chamfer2_edges, length=CHAMFER2_SIZE)

    # Chamfer3
    chamfer3_edges = [part.edges().sort_by_distance(p)[0] for p in [
        (-55.14, 6, -138),
    ]]
    chamfer(chamfer3_edges, length=CHAMFER3_SIZE)

    # Sketch57 → Cut-Extrude17 (cut)
    with BuildSketch(Plane(origin=(0, 26, 0), x_dir=(1, 0, 0), z_dir=(0, 1, 0))):
        with Locations(Location((-32.64, 138, 0), (0, 0, 270))):
            Circle(SKETCH57_R)
    extrude(amount=-CUT_EXTRUDE17_DEPTH, mode=Mode.SUBTRACT)

    # Sketch58 → Boss-Extrude36 (add)
    with BuildSketch(Plane(origin=(0, 6, 0), x_dir=(1, 0, 0), z_dir=(0, 1, 0))):
        Polygon((0, 125), (0, 128), (-0.14, 128), (-20.14, 128), (-45.14, 128), (-65.14, 128), (-80.75, 128), (-80.75, 117.6), (0, 117.6), (0, 121.6), (-77.75, 121.6), (-77.75, 125), align=None)
    extrude(amount=BOSS_EXTRUDE36_DEPTH)

    # Chamfer6
    chamfer6_edges = [part.edges().sort_by_distance(p)[0] for p in [
        (-72.945, 6, -128),
    ]]
    chamfer(chamfer6_edges, length=CHAMFER6_SIZE)

    # Sketch59 → Boss-Extrude37 (add)
    with BuildSketch(Plane.XY.offset(-117.6)):
        Polygon((-60.75, 6), (-60.75, 26), (-15.75, 26), (-15.75, 6), (-25.75, 6), (-25.75, 21), (-50.75, 21), (-50.75, 6), align=None)
    extrude(amount=BOSS_EXTRUDE37_DEPTH)

    # Chamfer7
    chamfer7_edges = [part.edges().sort_by_distance(p)[0] for p in [
        (-60.75, 6, -107.6),
    ]]
    chamfer(chamfer7_edges, length=CHAMFER7_SIZE)

    # Chamfer8
    chamfer8_edges = [part.edges().sort_by_distance(p)[0] for p in [
        (-15.75, 6, -107.6),
    ]]
    chamfer(chamfer8_edges, length=CHAMFER8_SIZE)

    # Sketch60 → Cut-Extrude18 (cut)
    with BuildSketch(Plane(origin=(0, 26, 0), x_dir=(1, 0, 0), z_dir=(0, 1, 0))):
        with Locations(Location((-38.25, 107.6, 0), (0, 0, 270))):
            Circle(SKETCH60_R)
    extrude(amount=-CUT_EXTRUDE18_DEPTH, mode=Mode.SUBTRACT)

    # Sketch61 → Cut-Extrude19 (cut)
    with BuildSketch(Plane(origin=(0, 88, 0), x_dir=(1, 0, 0), z_dir=(0, 1, 0))):
        Polygon((-138.9, 0), (-137.1, 0), (-137.1, 167.1), (0, 167.1), (0, 168.9), (-138.9, 168.9), align=None)
    extrude(amount=-CUT_EXTRUDE19_DEPTH, mode=Mode.SUBTRACT)

    # Sketch63 → Cut-Extrude20 (cut)
    with BuildSketch(Plane.ZY.offset(141)):
        with Locations((-159.5, 44)):
            Rectangle(SKETCH63_W, SKETCH63_H)
    extrude(amount=-CUT_EXTRUDE20_DEPTH, mode=Mode.SUBTRACT)

    # Sketch64 → Boss-Extrude39 (add)
    with BuildSketch(Plane(origin=(-128, 0, 0), x_dir=(0, 0, -1), z_dir=(1, 0, 0)).offset(BOSS_EXTRUDE39_START)):
        with BuildLine():
            Line((20.25, 22), (20.25, 6))
            Line((20.25, 6), (29.75, 6))
            Line((29.75, 6), (29.75, 22))
            ThreePointArc((29.75, 22), (25, 17.25), (20.25, 22))
        make_face()
    extrude(amount=BOSS_EXTRUDE39_DEPTH)

    # Sketch66 → Boss-Extrude40 (add)
    with BuildSketch(Plane.XY.offset(-75)):
        Polygon((-135, 13), (-135, 28), (-113, 6), (-128, 6), align=None)
    extrude(amount=BOSS_EXTRUDE40_DEPTH)

    # Sketch67 → Boss-Extrude41 (add)
    with BuildSketch(Plane.XY.offset(-125)):
        with Locations((-38.875, 16)):
            Rectangle(SKETCH67_W, SKETCH67_H)
    extrude(amount=BOSS_EXTRUDE41_DEPTH)

    # Sketch68 → Boss-Extrude42 (add)
    with BuildSketch(Plane(origin=(0, 0, -167.6), x_dir=(-1, 0, 0), z_dir=(0, 0, -1))):
        Polygon((65.5, 72.6), (55.5, 72.6), (65.5, 62.6), align=None)
        Polygon((65.5, 15.4), (65.5, 25.4), (55.5, 15.4), align=None)
    extrude(amount=-BOSS_EXTRUDE42_DEPTH)

    # Sketch69 → Cut-Extrude21 (cut)
    with BuildSketch(Plane(origin=(0, 0, -167.6), x_dir=(-1, 0, 0), z_dir=(0, 0, -1))):
        with Locations((62.7, 69.8)):
            Circle(SKETCH69_R)
        with Locations((62.7, 18.6)):
            Circle(SKETCH69_R)
    extrude(amount=-CUT_EXTRUDE21_DEPTH, mode=Mode.SUBTRACT)

    # Fillet1
    fillet1_edges = [part.edges().sort_by_distance(p)[0] for p in [
        (-137.1, 87.5, -167.1),
    ]]
    fillet(fillet1_edges, radius=FILLET1_R)

    # Fillet2
    fillet2_edges = [part.edges().sort_by_distance(p)[0] for p in [
        (-138.9, 87.5, -168.9),
    ]]
    fillet(fillet2_edges, radius=FILLET2_R)

    # Sketch70 → Cut-Extrude22 (cut)
    with BuildSketch(Plane.XZ):
        with Locations((-32.64, -138)):
            Rectangle(SKETCH70_W, SKETCH70_H)
        with Locations((-38.25, -107.6)):
            Rectangle(SKETCH70_W, SKETCH70_H)
    extrude(amount=-CUT_EXTRUDE22_DEPTH, mode=Mode.SUBTRACT)

    # Sketch71 → Boss-Extrude43 (add)
    with BuildSketch(Plane(origin=(0, 0, -148), x_dir=(-1, 0, 0), z_dir=(0, 0, -1))):
        Polygon((10.14, 16), (0.14, 6), (20.14, 6), (45.14, 6), (65.14, 6), (55.14, 16), (55.14, 26), (10.14, 26), align=None)
    extrude(amount=BOSS_EXTRUDE43_DEPTH)

    # Sketch72 → Boss-Extrude44 (add)
    with BuildSketch(Plane.XY.offset(-97.6)):
        Polygon((-5.75, 6), (-15.75, 16), (-15.75, 26), (-60.75, 26), (-60.75, 16), (-70.75, 6), (-50.75, 6), (-25.75, 6), align=None)
    extrude(amount=BOSS_EXTRUDE44_DEPTH)

    # Sketch73 → Cut-Extrude23 (cut)
    with BuildSketch(Plane.XZ):
        with Locations((30.12, -107.6)):
            Rectangle(SKETCH73_W, SKETCH73_H)
    extrude(amount=-CUT_EXTRUDE23_DEPTH, mode=Mode.SUBTRACT)

    # Sketch74 → Cut-Extrude24 (cut)
    with BuildSketch(Plane.XZ):
        with Locations(Location((-120, -159.5, 0), (0, 0, 270))):
            Circle(SKETCH74_R)
    extrude(amount=-CUT_EXTRUDE24_DEPTH, mode=Mode.SUBTRACT)


with BuildPart() as body_2:
    # Sketch5 → Boss-Extrude3 (new body)
    with BuildSketch(Plane.ZY.offset(141)):
        with Locations((4.5, 44)):
            Rectangle(SKETCH5_W, SKETCH5_H)
    extrude(amount=-BOSS_EXTRUDE3_DEPTH)


solid = Compound([part.part, body_2.part])
